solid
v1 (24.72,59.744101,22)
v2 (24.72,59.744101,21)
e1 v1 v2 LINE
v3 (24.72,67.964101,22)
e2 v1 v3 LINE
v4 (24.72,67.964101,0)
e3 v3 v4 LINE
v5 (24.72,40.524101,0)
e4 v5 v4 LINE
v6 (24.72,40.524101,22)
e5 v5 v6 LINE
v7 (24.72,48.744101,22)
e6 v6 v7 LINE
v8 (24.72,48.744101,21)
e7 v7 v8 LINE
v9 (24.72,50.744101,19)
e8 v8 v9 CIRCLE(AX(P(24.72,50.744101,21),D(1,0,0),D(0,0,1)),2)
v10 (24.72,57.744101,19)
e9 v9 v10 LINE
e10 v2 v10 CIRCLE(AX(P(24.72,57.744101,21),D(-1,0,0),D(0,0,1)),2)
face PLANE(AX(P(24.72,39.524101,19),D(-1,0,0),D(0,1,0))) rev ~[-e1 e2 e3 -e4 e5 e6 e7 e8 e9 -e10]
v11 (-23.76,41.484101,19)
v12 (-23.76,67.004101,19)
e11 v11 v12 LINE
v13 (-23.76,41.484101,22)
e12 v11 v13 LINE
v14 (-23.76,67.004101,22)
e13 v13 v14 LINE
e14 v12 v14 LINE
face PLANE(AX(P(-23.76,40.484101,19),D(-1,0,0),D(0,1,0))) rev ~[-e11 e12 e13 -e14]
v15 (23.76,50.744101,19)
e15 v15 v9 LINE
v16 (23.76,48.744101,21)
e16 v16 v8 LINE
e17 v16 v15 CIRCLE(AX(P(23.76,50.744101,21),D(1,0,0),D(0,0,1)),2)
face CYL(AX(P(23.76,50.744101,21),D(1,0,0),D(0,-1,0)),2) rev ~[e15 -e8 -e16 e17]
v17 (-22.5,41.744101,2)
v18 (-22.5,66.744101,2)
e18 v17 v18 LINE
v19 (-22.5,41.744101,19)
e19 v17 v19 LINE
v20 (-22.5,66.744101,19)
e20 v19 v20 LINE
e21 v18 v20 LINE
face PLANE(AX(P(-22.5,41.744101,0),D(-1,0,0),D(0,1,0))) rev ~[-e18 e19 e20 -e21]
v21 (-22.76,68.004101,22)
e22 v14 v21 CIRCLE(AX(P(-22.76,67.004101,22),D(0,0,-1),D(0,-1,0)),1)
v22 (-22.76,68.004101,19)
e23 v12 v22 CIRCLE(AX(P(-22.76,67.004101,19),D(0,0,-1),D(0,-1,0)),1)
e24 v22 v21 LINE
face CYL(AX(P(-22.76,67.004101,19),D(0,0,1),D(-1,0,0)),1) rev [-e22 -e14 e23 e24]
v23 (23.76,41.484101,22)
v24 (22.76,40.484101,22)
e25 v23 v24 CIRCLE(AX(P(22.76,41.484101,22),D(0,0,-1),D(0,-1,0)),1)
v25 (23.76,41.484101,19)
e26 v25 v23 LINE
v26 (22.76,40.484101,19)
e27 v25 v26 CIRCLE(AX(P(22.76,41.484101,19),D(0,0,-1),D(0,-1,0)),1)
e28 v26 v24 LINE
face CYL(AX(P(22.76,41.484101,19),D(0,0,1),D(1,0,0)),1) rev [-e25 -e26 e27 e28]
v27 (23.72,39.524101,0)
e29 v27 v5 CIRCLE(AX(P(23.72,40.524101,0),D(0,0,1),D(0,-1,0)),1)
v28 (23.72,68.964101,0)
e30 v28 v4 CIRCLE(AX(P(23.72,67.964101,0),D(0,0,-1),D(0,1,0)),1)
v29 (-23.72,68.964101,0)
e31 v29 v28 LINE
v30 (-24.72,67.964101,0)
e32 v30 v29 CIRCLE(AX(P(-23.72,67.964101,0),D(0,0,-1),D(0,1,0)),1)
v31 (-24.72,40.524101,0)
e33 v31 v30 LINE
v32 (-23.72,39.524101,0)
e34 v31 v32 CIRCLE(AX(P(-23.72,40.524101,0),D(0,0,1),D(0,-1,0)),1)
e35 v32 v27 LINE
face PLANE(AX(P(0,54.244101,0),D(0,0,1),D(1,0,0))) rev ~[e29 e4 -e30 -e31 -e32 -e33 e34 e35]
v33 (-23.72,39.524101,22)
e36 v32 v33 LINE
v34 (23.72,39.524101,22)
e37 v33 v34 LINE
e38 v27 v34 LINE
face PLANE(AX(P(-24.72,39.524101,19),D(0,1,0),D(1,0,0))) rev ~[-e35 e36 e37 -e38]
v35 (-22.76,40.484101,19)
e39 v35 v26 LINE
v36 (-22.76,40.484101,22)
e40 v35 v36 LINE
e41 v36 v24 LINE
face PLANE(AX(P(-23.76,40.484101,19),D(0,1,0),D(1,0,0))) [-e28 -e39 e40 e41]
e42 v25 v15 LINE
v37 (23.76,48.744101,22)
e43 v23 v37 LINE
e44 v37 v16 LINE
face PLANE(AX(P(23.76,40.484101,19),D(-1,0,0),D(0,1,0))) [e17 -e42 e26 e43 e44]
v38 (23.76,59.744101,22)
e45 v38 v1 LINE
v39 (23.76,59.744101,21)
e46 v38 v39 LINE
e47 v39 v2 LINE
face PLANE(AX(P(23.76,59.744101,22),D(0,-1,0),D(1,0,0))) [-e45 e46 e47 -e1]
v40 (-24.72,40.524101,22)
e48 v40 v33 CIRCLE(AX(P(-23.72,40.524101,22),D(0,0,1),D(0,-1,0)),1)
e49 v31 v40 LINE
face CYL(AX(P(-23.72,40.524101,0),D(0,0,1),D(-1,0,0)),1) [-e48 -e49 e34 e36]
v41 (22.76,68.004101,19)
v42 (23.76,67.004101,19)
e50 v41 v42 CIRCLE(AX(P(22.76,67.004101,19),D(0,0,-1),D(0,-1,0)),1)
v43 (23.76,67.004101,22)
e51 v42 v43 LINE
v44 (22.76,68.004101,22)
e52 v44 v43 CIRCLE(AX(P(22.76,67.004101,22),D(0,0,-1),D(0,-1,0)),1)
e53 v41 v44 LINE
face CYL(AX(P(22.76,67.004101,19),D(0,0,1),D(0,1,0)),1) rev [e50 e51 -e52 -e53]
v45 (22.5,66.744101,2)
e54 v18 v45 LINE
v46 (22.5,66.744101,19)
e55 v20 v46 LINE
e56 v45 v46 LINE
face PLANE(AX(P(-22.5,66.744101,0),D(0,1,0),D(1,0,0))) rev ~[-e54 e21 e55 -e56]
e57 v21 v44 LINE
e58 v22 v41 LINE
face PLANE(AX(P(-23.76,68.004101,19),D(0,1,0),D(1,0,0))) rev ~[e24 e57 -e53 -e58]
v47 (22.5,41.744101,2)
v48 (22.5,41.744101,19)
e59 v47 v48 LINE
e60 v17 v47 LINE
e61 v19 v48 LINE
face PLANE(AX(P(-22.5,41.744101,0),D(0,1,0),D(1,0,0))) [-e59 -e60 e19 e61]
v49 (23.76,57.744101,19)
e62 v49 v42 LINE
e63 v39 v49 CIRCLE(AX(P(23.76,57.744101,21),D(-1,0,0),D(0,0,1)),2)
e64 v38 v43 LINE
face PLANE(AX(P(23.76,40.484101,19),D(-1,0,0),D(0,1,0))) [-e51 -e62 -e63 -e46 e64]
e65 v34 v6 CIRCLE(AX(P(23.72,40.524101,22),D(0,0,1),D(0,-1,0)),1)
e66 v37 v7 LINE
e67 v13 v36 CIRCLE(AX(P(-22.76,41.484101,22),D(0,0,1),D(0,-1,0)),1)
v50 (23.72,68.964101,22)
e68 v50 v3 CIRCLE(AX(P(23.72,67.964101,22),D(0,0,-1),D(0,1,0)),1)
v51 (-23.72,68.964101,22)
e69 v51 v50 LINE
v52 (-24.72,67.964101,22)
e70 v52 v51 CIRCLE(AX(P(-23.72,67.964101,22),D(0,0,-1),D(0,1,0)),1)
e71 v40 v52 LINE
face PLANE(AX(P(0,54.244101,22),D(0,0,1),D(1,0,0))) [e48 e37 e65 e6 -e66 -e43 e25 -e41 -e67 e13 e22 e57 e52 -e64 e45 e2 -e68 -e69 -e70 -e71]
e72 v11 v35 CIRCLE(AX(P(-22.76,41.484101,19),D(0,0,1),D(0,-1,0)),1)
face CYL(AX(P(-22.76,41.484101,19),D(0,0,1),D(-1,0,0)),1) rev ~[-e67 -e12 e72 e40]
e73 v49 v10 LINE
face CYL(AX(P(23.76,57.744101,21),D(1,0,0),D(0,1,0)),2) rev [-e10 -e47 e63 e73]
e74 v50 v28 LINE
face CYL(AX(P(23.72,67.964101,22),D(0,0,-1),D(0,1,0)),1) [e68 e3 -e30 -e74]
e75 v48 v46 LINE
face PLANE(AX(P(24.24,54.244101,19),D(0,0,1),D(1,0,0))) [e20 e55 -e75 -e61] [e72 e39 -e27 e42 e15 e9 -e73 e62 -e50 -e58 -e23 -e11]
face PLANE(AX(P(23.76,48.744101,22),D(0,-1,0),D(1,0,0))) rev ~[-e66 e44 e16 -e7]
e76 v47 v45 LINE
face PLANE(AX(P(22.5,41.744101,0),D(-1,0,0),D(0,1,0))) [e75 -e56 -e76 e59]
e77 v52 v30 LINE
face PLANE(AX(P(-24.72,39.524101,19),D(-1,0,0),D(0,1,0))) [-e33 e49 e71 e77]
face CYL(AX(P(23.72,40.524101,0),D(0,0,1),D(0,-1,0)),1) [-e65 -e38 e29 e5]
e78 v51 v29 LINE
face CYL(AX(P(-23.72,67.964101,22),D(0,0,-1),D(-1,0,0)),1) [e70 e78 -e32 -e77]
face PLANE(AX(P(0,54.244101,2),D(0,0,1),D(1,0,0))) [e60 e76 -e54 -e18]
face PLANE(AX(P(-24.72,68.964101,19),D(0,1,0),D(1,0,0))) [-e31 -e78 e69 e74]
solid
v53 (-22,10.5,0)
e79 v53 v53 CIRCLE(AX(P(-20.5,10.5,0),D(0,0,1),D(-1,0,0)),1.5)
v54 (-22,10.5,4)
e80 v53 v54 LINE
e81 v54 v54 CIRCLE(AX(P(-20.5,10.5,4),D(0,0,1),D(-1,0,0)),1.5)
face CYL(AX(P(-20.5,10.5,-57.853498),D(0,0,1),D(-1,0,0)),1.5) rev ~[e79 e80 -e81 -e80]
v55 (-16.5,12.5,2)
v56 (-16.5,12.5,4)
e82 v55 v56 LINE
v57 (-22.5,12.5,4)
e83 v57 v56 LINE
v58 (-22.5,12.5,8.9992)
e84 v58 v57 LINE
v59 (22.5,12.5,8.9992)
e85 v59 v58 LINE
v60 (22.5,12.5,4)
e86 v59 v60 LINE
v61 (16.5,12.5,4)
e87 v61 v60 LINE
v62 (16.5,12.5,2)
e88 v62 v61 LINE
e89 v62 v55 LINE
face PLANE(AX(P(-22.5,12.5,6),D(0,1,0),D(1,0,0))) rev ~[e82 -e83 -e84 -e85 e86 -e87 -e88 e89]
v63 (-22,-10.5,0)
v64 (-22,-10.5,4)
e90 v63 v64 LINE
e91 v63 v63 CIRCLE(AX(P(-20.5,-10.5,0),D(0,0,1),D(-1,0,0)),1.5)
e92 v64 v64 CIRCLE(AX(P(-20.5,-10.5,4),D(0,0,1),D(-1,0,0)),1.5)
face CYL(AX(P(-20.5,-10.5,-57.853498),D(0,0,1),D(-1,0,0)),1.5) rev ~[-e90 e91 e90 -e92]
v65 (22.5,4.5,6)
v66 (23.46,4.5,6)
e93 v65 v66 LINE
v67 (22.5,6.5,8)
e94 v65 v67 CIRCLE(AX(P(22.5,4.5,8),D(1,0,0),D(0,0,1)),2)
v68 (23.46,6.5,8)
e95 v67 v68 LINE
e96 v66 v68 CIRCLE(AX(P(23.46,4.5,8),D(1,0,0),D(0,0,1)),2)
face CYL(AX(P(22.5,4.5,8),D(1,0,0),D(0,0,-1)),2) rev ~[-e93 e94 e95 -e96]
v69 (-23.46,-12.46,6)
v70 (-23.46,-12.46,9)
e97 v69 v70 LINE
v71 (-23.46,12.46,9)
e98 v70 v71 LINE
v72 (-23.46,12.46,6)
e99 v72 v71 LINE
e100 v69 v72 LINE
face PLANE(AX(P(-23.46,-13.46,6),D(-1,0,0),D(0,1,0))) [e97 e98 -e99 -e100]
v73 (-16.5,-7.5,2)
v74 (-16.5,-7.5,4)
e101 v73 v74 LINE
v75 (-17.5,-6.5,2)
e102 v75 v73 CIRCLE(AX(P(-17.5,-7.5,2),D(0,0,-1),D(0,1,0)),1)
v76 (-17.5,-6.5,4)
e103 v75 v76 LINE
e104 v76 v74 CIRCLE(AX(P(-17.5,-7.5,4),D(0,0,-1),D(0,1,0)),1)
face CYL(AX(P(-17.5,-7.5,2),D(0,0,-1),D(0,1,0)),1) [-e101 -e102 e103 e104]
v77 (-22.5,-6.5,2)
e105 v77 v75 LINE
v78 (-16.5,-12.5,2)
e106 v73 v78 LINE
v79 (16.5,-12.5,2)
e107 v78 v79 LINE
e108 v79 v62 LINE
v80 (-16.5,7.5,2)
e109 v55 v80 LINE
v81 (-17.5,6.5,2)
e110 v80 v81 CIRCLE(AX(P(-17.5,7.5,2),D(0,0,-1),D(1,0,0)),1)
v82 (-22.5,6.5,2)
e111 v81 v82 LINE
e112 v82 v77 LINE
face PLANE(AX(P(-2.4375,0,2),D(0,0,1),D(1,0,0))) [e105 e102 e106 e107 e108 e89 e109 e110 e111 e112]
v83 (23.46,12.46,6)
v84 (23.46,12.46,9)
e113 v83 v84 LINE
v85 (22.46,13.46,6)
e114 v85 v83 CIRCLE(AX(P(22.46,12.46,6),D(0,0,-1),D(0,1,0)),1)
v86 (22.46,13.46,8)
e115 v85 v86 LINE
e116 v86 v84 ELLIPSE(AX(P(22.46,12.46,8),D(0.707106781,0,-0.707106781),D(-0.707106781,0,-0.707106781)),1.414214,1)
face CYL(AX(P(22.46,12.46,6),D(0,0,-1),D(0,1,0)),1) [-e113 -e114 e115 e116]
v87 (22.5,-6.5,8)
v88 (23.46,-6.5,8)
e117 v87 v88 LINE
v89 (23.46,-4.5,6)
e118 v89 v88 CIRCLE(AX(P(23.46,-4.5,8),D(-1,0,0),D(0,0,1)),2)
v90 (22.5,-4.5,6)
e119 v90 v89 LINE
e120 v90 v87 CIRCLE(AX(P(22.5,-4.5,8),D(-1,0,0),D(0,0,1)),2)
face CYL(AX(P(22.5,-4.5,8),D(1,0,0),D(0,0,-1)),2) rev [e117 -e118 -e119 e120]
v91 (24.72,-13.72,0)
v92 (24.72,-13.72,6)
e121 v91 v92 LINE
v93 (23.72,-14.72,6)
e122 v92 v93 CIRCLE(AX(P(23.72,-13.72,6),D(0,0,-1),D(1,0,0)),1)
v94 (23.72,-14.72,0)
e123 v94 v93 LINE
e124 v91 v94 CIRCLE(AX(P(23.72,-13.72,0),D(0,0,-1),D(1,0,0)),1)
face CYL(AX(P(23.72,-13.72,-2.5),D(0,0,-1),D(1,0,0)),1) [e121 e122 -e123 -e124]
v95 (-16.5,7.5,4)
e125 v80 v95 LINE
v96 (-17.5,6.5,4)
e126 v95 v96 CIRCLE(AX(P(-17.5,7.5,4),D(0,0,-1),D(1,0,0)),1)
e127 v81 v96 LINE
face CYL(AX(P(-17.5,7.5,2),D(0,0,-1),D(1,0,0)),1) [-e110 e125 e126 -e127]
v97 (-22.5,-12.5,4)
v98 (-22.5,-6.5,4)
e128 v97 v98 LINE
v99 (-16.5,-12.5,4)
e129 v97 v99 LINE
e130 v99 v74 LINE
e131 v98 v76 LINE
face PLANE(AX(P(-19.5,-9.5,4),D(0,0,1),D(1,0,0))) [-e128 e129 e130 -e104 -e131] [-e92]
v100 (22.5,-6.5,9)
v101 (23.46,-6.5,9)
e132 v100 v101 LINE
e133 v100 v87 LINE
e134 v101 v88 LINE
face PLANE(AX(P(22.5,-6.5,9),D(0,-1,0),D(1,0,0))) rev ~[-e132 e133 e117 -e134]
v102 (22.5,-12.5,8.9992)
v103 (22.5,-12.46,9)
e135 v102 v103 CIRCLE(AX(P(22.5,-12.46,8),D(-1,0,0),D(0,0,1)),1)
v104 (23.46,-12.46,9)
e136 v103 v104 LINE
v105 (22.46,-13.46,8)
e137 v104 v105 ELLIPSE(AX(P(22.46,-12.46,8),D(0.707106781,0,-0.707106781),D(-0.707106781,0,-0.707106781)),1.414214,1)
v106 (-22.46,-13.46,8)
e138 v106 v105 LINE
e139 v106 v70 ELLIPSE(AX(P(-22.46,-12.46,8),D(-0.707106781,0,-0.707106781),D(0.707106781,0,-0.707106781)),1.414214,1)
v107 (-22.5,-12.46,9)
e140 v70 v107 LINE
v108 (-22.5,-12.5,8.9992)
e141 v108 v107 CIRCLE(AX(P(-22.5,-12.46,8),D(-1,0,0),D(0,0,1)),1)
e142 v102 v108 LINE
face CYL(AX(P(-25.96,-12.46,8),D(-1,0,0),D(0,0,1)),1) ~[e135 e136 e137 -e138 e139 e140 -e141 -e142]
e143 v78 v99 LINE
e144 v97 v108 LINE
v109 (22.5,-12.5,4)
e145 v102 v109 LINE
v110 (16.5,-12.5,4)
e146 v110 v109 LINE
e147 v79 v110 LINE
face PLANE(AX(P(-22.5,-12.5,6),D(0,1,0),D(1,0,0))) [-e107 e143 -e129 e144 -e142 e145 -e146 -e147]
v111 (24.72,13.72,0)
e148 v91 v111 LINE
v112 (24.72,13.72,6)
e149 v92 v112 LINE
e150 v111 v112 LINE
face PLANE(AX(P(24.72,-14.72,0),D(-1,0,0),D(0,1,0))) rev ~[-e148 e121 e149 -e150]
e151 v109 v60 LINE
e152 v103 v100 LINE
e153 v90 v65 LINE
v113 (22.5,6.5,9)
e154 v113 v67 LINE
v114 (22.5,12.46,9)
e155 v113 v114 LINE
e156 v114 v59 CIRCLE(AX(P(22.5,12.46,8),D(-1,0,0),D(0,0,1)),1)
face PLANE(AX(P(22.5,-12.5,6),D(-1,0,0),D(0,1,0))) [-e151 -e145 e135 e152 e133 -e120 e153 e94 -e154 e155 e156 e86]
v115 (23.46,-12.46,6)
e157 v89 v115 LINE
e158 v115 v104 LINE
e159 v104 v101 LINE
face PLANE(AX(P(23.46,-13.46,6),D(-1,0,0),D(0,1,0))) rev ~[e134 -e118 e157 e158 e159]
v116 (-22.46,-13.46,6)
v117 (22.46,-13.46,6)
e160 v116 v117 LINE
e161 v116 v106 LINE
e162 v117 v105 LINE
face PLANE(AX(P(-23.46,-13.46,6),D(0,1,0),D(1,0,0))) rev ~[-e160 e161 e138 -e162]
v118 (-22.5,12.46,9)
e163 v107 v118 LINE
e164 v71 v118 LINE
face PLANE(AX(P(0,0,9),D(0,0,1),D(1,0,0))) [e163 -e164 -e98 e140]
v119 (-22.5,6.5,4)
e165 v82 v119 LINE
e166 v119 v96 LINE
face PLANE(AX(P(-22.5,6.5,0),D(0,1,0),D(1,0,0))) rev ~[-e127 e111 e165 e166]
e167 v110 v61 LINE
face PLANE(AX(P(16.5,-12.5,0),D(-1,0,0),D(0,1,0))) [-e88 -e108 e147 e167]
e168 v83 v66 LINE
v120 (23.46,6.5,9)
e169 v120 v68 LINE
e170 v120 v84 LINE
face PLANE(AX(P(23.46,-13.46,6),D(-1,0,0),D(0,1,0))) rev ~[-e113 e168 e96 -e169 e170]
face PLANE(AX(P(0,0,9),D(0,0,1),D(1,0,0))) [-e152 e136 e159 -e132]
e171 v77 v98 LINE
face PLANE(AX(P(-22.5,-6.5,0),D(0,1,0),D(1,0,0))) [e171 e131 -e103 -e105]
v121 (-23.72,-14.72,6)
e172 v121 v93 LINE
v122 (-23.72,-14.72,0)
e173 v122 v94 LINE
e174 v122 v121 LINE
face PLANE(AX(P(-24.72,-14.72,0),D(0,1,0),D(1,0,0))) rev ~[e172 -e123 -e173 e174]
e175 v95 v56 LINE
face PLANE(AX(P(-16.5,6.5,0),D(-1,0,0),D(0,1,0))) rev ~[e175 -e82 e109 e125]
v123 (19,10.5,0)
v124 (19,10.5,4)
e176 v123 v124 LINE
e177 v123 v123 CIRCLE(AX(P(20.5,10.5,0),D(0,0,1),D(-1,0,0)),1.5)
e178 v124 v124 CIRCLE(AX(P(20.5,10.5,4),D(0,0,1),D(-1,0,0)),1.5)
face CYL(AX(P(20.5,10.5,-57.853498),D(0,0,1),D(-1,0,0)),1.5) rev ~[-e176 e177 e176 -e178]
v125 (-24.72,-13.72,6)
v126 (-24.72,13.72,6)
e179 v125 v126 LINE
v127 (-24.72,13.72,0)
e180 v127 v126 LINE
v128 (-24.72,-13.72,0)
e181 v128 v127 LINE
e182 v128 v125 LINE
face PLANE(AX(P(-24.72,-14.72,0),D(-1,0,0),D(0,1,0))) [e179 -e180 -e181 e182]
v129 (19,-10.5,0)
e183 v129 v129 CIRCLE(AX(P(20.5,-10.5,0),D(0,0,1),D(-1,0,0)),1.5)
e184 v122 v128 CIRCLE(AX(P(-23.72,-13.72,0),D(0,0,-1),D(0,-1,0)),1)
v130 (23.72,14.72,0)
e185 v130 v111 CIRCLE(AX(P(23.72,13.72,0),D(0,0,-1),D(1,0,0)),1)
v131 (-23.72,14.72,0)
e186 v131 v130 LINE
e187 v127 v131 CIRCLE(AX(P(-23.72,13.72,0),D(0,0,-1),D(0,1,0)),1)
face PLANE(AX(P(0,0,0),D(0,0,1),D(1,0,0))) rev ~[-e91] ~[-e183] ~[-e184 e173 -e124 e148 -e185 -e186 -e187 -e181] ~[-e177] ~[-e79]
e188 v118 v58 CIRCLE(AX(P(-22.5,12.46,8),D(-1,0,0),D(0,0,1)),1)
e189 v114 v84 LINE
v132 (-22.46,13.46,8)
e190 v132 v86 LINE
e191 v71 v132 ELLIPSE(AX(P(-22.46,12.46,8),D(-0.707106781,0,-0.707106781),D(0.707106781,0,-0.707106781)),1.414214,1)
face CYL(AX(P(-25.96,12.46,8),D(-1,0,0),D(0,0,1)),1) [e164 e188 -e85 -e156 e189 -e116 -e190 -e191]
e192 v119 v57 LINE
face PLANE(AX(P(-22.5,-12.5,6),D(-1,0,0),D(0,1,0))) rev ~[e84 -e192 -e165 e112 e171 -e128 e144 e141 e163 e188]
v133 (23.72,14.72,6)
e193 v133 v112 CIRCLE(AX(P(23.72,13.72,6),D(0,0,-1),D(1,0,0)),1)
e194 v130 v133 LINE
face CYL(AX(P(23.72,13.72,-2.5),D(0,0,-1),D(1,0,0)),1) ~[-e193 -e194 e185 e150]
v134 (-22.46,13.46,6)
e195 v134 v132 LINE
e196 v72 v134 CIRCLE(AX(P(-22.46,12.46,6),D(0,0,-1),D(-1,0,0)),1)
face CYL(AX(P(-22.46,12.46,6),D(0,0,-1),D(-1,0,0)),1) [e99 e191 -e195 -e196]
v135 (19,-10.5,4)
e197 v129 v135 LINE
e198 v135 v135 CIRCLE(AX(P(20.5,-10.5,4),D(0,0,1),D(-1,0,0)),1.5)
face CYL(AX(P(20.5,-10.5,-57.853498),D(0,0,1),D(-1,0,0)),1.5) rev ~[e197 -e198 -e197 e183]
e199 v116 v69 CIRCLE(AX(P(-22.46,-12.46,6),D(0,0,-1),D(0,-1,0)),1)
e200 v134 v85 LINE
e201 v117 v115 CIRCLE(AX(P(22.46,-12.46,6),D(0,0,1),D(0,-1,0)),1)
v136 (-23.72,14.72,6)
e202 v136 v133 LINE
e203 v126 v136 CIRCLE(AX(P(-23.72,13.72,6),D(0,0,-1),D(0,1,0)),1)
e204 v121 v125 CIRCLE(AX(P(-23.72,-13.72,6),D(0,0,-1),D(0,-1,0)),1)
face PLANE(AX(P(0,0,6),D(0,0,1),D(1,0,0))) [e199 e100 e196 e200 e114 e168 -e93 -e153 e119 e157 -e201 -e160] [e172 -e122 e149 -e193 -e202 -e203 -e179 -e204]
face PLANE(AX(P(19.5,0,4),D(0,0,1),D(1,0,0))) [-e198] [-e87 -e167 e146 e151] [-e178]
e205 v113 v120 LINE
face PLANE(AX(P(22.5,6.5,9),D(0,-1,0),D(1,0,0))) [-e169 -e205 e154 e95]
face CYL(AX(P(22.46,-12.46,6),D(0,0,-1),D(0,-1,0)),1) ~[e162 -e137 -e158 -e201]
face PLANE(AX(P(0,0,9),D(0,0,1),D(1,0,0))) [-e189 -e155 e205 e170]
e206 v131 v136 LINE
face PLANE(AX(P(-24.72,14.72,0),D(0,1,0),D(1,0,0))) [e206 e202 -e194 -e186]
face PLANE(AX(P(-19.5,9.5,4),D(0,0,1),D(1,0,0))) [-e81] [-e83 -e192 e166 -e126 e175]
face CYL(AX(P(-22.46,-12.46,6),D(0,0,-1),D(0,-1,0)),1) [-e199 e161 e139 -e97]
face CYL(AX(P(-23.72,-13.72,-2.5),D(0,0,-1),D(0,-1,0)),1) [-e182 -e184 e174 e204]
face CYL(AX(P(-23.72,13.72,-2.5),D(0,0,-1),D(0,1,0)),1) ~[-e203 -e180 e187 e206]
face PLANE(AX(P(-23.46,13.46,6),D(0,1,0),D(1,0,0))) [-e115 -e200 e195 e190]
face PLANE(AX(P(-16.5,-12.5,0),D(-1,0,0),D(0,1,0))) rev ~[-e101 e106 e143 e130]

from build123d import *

# Parameters (mm, degrees)
F1_DEPTH     = 2
F0_W         = 6
F0_H         = 6
F0_H_2       = 25
F2_DEPTH     = 4
F0_W_2       = 49.44
F0_H_3       = 29.44
F3_DEPTH     = 6
F4_D         = 3
F5_W         = 46.92
F5_H         = 26.92
F5_W_2       = 45
F5_H_2       = 25
F6_DEPTH     = 3
F7_W         = 0.96
F7_H         = 13
F8_DEPTH     = 3
F0_W_3       = 45
F9_DEPTH     = 2
F10_DEPTH    = 19
F11_W        = 49.44
F11_H        = 29.44
F11_W_2      = 47.52
F11_H_2      = 27.52
F12_DEPTH    = 3
F13_T1_DEPTH = 4.5
F13_T3_DEPTH = 5.5
F13_T5_DEPTH = 51.92
F13_T7_DEPTH = 11
F13_2_F1_R   = 1
F13_2_F2_R   = 1
F14_W        = 0.96
F14_H        = 11
F15_DEPTH    = 3
F16_R        = 2
F16_2_R      = 2


# Not quite as in the source:
# - a fillet or chamfer that OpenCascade refuses, or shapes differently, is made with other operations: its cross-section is extruded or revolved along the edge and cut away or added


with BuildPart() as f1:
    # F0 (on Top) → F1 (new body)
    with BuildSketch(Plane.XY):
        Polygon((-16.5, -12.5), (16.5, -12.5), (16.5, 12.5), (-16.5, 12.5), (-16.5, 6.5), (-22.5, 6.5), (-22.5, -6.5), (-16.5, -6.5), align=None)
    extrude(amount=F1_DEPTH)

    # F0 (on Top) → F2 (join)
    with BuildSketch(Plane.XY):
        with Locations((-19.5, 9.5)):
            Rectangle(F0_W, F0_H)
        with Locations((-19.5, -9.5)):
            Rectangle(F0_W, F0_H)
        with Locations((19.5, 0)):
            Rectangle(F0_W, F0_H_2)
    extrude(amount=F2_DEPTH)

    # F0 (on Top) → F3 (join)
    with BuildSketch(Plane.XY):
        Rectangle(F0_W_2, F0_H_3)
        Polygon((22.5, 12.5), (22.5, -12.5), (16.5, -12.5), (-16.5, -12.5), (-22.5, -12.5), (-22.5, -6.5), (-22.5, 6.5), (-22.5, 12.5), (-16.5, 12.5), (16.5, 12.5), align=None, mode=Mode.SUBTRACT)
    extrude(amount=F3_DEPTH)

    # F4 (through all)
    with Locations(Plane(origin=(0, 0, 0), x_dir=(1, 0, 0), z_dir=(0, 0, -1))):
        with Locations((-20.5, 10.5), (20.5, -10.5), (20.5, 10.5), (-20.5, -10.5)):
            Hole(F4_D / 2)

    # F5 (on face) → F6 (join)
    with BuildSketch(Plane.XY.offset(6)):
        Rectangle(F5_W, F5_H)
        Rectangle(F5_W_2, F5_H_2, mode=Mode.SUBTRACT)
    extrude(amount=F6_DEPTH)

    # F7 (on face) → F8 (cut)
    with BuildSketch(Plane.XY.offset(9)):
        with Locations((22.98, 0)):
            Rectangle(F7_W, F7_H)
    extrude(amount=-F8_DEPTH, mode=Mode.SUBTRACT)

    # F13: fillet of radius 1 on 12 edges, made by hand

    # F13_s2 → F13_t1 (cut)
    with BuildSketch(Plane.XY.offset(2)):
        with BuildLine():
            ThreePointArc((-16.5, 7.5), (-16.7928932188, 6.7928932188), (-17.5, 6.5))
            Line((-17.5, 6.5), (-16.5, 6.5))
            Line((-16.5, 6.5), (-16.5, 7.5))
        make_face()
        with BuildLine():
            ThreePointArc((-17.5, -6.5), (-16.7928932188, -6.7928932188), (-16.5, -7.5))
            Line((-16.5, -7.5), (-16.5, -6.5))
            Line((-16.5, -6.5), (-17.5, -6.5))
        make_face()
    extrude(amount=F13_T1_DEPTH, mode=Mode.SUBTRACT)

    # F13_s4 → F13_t3 (cut)
    with BuildSketch(Plane.XY.offset(6)):
        with BuildLine():
            ThreePointArc((-23.46, 12.46), (-23.1671067812, 13.1671067812), (-22.46, 13.46))
            Line((-22.46, 13.46), (-23.46, 13.46))
            Line((-23.46, 13.46), (-23.46, 12.46))
        make_face()
        with BuildLine():
            ThreePointArc((22.46, 13.46), (23.1671067812, 13.1671067812), (23.46, 12.46))
            Line((23.46, 12.46), (23.46, 13.46))
            Line((23.46, 13.46), (22.46, 13.46))
        make_face()
        with BuildLine():
            ThreePointArc((-22.46, -13.46), (-23.1671067812, -13.1671067812), (-23.46, -12.46))
            Line((-23.46, -12.46), (-23.46, -13.46))
            Line((-23.46, -13.46), (-22.46, -13.46))
        make_face()
        with BuildLine():
            ThreePointArc((22.46, -13.46), (23.1671067812, -13.1671067812), (23.46, -12.46))
            Line((23.46, -12.46), (23.46, -13.46))
            Line((23.46, -13.46), (22.46, -13.46))
        make_face()
    extrude(amount=F13_T3_DEPTH, mode=Mode.SUBTRACT)

    # F13_s6 → F13_t5 (cut)
    with BuildSketch(Plane.YZ.offset(-25.96)):
        with BuildLine():
            ThreePointArc((-12.46, 9), (-13.1671067812, 8.7071067812), (-13.46, 8))
            Line((-13.46, 8), (-13.46, 9))
            Line((-13.46, 9), (-12.46, 9))
        make_face()
        with BuildLine():
            ThreePointArc((12.46, 9), (13.1671067812, 8.7071067812), (13.46, 8))
            Line((13.46, 8), (13.46, 9))
            Line((13.46, 9), (12.46, 9))
        make_face()
    extrude(amount=F13_T5_DEPTH, mode=Mode.SUBTRACT)

    # F13_s8 → F13_t7 (cut)
    with BuildSketch(Plane.XY.offset(-2.5)):
        with BuildLine():
            ThreePointArc((-23.72, -14.72), (-24.4271067812, -14.4271067812), (-24.72, -13.72))
            Line((-24.72, -13.72), (-24.72, -14.72))
            Line((-24.72, -14.72), (-23.72, -14.72))
        make_face()
        with BuildLine():
            ThreePointArc((-23.72, 14.72), (-24.4271067812, 14.4271067812), (-24.72, 13.72))
            Line((-24.72, 13.72), (-24.72, 14.72))
            Line((-24.72, 14.72), (-23.72, 14.72))
        make_face()
        with BuildLine():
            ThreePointArc((24.72, -13.72), (24.4271067812, -14.4271067812), (23.72, -14.72))
            Line((23.72, -14.72), (24.72, -14.72))
            Line((24.72, -14.72), (24.72, -13.72))
        make_face()
        with BuildLine():
            ThreePointArc((24.72, 13.72), (24.4271067812, 14.4271067812), (23.72, 14.72))
            Line((23.72, 14.72), (24.72, 14.72))
            Line((24.72, 14.72), (24.72, 13.72))
        make_face()
    extrude(amount=F13_T7_DEPTH, mode=Mode.SUBTRACT)

    # F16
    f16_edges = [f1.edges().sort_by_distance(p)[0] for p in [
        (22.98, 6.5, 6),
        (22.98, -6.5, 6),
    ]]
    fillet(f16_edges, radius=F16_R)


with BuildPart() as f9:
    # F0 (on Top) → F9 (new body)
    with BuildSketch(Plane.XY):
        with Locations((0, 54.2441010475)):
            Rectangle(F0_W_3, F0_H_2)
    extrude(amount=F9_DEPTH)

    # F0 (on Top) → F10 (join)
    with BuildSketch(Plane.XY):
        with Locations((0, 54.2441010475)):
            Rectangle(F0_W_2, F0_H_3)
        with Locations((0, 54.2441010475)):
            Rectangle(F0_W_3, F0_H_2, mode=Mode.SUBTRACT)
    extrude(amount=F10_DEPTH)

    # F11 (on face) → F12 (join)
    with BuildSketch(Plane.XY.offset(19)):
        with Locations((0, 54.2441010475)):
            Rectangle(F11_W, F11_H)
        with Locations((0, 54.2441010475)):
            Rectangle(F11_W_2, F11_H_2, mode=Mode.SUBTRACT)
    extrude(amount=F12_DEPTH)

    # F13#2: fillet of radius 1 on 8 edges, made by hand

    # F13_2_f1
    f13_2_f1_edges = [f9.edges().sort_by_distance(p)[0] for p in [
        (-23.76, 68.0041010475, 20.5),
        (23.76, 68.0041010475, 20.5),
        (23.76, 40.4841010475, 20.5),
        (-23.76, 40.4841010475, 20.5),
    ]]
    fillet(f13_2_f1_edges, radius=F13_2_F1_R)

    # F13_2_f2
    f13_2_f2_edges = [f9.edges().sort_by_distance(p)[0] for p in [
        (-24.72, 39.5241010475, 11),
        (-24.72, 68.9641010475, 11),
        (24.72, 68.9641010475, 11),
        (24.72, 39.5241010475, 11),
    ]]
    fillet(f13_2_f2_edges, radius=F13_2_F2_R)

    # F14 (on face) → F15 (cut)
    with BuildSketch(Plane.XY.offset(22)):
        with Locations((24.24, 54.2441010475)):
            Rectangle(F14_W, F14_H)
    extrude(amount=-F15_DEPTH, mode=Mode.SUBTRACT)

    # F16#2
    f16_2_edges = [f9.edges().sort_by_distance(p)[0] for p in [
        (24.24, 59.744101, 19),
        (24.24, 48.744101, 19),
    ]]
    fillet(f16_2_edges, radius=F16_2_R)


solid = Compound([f1.part, f9.part])
